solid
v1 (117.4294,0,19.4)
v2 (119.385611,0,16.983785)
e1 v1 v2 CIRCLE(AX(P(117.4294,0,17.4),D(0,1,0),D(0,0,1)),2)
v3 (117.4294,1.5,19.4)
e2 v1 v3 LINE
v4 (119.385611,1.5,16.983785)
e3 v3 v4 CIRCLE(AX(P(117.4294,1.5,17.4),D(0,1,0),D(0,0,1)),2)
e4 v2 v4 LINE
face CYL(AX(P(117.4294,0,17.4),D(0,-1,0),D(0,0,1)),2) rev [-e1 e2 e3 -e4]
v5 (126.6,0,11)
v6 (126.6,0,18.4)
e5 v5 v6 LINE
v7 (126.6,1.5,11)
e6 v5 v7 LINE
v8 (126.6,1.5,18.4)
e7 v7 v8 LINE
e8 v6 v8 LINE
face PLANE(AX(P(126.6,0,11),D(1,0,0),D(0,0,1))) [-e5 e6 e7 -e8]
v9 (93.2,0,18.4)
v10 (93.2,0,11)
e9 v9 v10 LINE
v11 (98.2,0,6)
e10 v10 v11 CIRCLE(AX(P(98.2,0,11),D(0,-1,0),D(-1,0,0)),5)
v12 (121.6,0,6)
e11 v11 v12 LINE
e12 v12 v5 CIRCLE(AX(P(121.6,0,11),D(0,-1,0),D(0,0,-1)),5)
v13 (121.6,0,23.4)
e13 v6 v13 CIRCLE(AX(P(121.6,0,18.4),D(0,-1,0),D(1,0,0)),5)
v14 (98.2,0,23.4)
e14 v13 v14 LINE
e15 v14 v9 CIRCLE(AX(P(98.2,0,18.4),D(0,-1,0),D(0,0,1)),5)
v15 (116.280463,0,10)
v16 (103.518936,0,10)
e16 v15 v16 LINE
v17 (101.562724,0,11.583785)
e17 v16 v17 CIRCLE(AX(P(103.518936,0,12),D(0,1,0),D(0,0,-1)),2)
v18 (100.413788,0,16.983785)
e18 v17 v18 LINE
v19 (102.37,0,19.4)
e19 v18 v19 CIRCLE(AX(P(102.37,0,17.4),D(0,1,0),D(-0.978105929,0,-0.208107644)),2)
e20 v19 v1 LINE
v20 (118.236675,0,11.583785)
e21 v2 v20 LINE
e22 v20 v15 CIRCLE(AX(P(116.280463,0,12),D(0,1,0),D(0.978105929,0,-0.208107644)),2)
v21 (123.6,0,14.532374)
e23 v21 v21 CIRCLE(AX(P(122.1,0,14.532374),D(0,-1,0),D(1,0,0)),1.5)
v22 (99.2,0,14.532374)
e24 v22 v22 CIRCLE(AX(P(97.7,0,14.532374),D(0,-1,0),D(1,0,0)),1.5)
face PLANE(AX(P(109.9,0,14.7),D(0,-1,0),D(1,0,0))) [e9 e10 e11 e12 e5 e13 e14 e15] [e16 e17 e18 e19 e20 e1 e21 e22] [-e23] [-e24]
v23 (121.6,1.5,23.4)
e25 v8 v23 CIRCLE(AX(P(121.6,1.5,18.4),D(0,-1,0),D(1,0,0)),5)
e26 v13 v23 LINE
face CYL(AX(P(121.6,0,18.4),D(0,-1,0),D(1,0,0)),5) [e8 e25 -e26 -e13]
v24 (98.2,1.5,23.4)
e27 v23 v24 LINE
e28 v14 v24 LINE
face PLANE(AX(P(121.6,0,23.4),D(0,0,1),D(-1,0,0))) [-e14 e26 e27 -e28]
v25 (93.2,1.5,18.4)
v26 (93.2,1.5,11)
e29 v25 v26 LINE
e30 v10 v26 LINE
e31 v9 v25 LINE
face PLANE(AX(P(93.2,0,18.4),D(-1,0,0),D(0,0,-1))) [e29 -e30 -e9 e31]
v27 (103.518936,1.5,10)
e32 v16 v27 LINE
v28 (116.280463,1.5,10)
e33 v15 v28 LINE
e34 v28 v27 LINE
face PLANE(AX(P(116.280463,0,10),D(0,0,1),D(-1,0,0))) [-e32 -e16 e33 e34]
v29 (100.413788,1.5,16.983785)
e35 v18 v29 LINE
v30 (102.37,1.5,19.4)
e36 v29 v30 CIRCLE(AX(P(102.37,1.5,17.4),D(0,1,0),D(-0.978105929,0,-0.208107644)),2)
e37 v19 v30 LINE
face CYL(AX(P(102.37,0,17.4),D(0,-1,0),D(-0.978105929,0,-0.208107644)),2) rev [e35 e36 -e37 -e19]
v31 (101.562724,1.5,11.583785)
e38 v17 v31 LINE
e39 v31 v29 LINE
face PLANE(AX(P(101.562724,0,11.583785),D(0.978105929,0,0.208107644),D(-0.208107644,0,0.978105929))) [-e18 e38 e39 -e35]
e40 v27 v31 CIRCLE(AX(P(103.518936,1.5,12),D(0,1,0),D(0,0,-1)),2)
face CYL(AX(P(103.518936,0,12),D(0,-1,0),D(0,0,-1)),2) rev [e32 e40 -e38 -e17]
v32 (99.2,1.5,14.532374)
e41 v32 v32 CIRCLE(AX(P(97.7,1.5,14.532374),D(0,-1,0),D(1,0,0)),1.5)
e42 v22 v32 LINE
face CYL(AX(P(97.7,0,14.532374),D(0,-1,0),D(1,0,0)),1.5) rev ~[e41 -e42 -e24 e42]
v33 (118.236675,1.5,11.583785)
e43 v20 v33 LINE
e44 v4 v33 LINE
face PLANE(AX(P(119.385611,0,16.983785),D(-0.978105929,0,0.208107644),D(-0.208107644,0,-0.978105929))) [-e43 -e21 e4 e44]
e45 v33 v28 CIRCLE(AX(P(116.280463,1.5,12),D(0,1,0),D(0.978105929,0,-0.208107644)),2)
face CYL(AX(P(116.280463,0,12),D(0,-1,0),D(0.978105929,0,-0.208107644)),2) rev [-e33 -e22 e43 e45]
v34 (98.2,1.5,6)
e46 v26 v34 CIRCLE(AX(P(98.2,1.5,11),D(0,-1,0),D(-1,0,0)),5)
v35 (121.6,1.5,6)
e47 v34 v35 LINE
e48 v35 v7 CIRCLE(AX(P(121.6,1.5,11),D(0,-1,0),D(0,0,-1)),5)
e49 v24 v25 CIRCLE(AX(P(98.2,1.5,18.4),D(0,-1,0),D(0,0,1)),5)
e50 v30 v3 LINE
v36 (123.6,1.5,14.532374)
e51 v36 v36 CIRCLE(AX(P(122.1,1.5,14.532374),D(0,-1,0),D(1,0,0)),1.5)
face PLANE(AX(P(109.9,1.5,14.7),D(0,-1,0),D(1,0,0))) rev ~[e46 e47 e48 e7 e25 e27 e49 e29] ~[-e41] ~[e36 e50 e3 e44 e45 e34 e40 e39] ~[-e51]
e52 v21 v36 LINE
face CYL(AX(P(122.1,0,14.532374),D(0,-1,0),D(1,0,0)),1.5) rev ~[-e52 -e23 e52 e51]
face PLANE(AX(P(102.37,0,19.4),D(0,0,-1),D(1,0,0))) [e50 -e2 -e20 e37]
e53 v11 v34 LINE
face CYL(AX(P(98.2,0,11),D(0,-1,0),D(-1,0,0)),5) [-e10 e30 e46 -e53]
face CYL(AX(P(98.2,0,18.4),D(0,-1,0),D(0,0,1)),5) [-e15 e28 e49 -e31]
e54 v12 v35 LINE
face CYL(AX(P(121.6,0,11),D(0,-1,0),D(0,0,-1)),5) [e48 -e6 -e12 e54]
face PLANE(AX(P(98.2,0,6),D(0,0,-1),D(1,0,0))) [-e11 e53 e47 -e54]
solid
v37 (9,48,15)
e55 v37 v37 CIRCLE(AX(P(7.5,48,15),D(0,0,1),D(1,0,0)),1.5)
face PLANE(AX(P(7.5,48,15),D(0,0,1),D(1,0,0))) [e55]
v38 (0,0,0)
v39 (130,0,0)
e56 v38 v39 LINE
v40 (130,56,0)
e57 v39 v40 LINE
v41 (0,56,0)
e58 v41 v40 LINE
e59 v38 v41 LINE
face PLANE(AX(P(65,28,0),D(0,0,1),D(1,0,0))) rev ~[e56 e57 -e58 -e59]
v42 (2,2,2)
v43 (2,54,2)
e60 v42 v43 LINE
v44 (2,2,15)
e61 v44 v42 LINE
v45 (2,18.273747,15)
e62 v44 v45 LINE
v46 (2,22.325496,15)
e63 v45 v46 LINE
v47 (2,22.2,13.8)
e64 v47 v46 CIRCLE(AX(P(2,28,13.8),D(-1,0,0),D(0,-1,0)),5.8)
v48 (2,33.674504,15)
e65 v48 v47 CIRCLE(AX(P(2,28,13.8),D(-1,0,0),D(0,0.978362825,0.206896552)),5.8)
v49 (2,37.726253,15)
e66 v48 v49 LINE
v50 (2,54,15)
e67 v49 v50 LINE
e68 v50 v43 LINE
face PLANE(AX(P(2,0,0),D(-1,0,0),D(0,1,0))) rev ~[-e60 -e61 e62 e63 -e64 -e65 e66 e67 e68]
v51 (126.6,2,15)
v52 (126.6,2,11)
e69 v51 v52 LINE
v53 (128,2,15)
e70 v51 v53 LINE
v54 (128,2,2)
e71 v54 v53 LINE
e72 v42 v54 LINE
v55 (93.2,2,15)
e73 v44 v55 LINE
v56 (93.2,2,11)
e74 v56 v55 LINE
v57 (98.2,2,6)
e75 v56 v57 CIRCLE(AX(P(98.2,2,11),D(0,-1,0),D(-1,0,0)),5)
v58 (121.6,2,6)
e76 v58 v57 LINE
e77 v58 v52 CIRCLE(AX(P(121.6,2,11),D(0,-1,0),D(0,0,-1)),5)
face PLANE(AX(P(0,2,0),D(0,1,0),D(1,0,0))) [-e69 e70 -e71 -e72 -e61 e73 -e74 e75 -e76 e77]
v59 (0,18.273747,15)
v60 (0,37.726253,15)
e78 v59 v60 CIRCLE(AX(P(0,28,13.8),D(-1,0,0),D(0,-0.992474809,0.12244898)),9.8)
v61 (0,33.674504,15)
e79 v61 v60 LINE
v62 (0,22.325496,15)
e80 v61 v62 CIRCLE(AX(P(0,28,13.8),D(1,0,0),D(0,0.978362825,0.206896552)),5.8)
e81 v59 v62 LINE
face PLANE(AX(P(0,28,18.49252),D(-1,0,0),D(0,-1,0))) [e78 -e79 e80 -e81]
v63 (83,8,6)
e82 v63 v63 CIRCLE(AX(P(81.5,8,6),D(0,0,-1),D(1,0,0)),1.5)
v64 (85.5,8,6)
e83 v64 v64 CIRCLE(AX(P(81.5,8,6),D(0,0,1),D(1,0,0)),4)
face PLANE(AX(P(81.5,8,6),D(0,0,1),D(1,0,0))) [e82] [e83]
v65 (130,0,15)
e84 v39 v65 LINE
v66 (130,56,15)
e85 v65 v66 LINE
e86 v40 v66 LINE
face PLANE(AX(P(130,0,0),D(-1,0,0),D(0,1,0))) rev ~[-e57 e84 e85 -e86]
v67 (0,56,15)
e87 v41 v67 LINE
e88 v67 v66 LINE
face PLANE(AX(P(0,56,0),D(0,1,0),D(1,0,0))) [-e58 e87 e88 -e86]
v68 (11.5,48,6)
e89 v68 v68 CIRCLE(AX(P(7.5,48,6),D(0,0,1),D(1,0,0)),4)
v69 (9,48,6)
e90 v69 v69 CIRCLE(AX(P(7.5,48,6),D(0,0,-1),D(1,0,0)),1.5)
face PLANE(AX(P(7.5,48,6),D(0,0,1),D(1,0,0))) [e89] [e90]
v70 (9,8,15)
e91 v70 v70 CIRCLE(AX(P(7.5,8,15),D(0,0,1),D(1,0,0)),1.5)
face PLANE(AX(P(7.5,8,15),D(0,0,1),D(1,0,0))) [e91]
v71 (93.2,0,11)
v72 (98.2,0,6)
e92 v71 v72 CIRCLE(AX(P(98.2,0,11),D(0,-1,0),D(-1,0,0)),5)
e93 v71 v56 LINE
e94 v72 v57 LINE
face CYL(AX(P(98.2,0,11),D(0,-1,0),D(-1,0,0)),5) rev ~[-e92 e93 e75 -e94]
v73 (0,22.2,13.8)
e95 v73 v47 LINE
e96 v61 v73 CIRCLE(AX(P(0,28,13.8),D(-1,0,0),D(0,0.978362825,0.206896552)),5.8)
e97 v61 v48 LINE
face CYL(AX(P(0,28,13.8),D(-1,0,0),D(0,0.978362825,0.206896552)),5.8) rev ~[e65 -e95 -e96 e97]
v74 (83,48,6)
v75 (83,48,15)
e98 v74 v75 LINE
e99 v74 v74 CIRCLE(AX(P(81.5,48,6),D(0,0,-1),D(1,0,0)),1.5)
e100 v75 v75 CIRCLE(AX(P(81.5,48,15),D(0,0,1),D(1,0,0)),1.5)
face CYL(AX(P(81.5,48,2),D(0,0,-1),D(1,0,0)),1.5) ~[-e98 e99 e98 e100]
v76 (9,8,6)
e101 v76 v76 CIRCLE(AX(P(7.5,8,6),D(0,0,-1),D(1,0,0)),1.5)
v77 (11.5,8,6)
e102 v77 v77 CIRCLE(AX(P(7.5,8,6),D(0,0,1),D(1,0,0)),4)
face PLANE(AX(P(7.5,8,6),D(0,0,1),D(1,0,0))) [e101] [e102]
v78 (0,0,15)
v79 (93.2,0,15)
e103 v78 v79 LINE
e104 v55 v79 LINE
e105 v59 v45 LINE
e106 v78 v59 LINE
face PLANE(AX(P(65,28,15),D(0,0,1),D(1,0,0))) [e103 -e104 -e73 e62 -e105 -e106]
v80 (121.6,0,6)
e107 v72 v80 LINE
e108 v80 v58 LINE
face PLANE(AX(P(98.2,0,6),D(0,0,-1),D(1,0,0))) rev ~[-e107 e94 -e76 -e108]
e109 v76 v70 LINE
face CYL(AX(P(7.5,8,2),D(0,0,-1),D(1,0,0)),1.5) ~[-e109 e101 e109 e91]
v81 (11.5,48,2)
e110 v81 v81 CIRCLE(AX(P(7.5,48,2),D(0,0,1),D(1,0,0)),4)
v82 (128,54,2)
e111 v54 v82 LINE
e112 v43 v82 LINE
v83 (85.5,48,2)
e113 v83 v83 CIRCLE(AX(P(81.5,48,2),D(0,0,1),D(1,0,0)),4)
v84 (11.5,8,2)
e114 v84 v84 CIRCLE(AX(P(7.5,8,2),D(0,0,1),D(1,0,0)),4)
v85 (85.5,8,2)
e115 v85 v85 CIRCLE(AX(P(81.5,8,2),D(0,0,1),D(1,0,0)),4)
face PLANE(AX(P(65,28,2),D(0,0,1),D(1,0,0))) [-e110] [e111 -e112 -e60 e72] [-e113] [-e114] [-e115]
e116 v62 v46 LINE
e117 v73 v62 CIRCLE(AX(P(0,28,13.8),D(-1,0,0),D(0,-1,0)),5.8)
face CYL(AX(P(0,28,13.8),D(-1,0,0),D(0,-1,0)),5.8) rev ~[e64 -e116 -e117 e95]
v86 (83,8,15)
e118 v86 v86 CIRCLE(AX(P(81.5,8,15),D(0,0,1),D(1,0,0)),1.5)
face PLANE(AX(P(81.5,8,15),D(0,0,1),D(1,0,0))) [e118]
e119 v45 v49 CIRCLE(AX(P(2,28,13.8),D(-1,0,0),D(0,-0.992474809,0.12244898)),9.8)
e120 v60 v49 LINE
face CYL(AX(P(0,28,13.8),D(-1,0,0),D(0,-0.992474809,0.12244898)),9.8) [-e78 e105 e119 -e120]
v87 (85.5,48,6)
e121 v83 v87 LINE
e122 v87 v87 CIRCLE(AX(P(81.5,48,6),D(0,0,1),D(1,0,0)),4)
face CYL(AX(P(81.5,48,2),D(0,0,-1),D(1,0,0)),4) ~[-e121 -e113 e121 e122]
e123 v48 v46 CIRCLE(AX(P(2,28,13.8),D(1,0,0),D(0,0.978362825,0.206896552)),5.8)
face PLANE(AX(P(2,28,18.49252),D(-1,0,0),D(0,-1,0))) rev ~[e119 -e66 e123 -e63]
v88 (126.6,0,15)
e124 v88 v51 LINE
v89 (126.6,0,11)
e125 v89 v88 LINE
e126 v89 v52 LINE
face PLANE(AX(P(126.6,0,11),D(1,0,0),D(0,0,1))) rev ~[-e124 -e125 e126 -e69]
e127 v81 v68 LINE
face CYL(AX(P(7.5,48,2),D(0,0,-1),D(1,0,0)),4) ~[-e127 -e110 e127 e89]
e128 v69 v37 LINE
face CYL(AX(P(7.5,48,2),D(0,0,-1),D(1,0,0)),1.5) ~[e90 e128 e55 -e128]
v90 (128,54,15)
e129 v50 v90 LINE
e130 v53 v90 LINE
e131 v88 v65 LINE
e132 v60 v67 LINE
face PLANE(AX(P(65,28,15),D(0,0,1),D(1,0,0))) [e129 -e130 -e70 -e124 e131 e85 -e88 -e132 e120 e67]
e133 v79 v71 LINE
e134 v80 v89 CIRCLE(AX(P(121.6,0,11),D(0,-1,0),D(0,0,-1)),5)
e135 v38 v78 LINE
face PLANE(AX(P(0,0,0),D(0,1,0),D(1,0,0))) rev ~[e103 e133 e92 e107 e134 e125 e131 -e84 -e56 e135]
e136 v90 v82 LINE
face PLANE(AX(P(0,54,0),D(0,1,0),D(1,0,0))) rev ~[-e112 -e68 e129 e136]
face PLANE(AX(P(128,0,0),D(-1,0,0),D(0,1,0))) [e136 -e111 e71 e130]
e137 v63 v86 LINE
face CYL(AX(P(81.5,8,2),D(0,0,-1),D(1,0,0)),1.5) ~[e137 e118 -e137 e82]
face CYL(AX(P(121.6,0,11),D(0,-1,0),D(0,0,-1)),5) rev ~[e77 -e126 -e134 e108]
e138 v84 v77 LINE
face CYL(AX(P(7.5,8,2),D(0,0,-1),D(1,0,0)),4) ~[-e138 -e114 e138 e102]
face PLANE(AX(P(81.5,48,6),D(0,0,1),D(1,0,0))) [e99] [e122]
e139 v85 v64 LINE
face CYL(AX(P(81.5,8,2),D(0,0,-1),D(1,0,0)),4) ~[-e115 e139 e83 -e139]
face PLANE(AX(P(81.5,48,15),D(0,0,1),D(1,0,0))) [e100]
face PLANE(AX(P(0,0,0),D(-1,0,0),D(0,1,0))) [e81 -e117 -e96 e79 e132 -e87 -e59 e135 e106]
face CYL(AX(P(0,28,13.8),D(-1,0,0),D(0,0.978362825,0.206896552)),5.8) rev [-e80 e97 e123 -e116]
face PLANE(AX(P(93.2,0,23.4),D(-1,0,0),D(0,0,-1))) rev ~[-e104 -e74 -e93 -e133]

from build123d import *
from build123d import SkipClean  # not in build123d's __all__

# Parameters (mm, degrees)
F0_W      = 130
F0_H      = 56
F1_DEPTH  = 15
F2_T      = -2
F3_R      = 1.5
F4_DEPTH  = 13
F5_R      = 4
F6_DEPTH  = 4
F9_DEPTH  = 5
F7_R      = 1.5
F10_DEPTH = 1.5
F12_DEPTH = 25
F14_DEPTH = 2


with BuildPart() as f1:
    # F0 (on Top) → F1 (new body)
    with BuildSketch(Plane.XY):
        with Locations((65, 28)):
            Rectangle(F0_W, F0_H)
    extrude(amount=F1_DEPTH)

    # F2
    f2_openings = [f1.faces().sort_by_distance(p)[0] for p in [
        (65, 28, 15),
    ]]
    offset(amount=F2_T, openings=f2_openings)

    # F3 (on face) → F4 (join)
    with BuildSketch(Plane.XY.offset(2)):
        with Locations((81.5, 48)):
            Circle(F3_R)
        with Locations((81.5, 8)):
            Circle(F3_R)
        with Locations((7.5, 8)):
            Circle(F3_R)
        with Locations((7.5, 48)):
            Circle(F3_R)
    extrude(amount=F4_DEPTH)

    # F5 (on face) → F6 (join)
    with BuildSketch(Plane.XY.offset(2)):
        with Locations((81.5, 48)):
            Circle(F5_R)
        with Locations((81.5, 8)):
            Circle(F5_R)
        with Locations((7.5, 48)):
            Circle(F5_R)
        with Locations((7.5, 8)):
            Circle(F5_R)
    extrude(amount=F6_DEPTH)

    # F8 (on face) → F9 (cut)
    with BuildSketch(Plane.XZ):
        with BuildLine():
            Line((126.6, 23.4), (93.2, 23.4))
            Line((93.2, 23.4), (93.2, 11))
            ThreePointArc((93.2, 11), (94.6644660941, 7.4644660941), (98.2, 6))
            Line((98.2, 6), (121.6, 6))
            ThreePointArc((121.6, 6), (125.1355339059, 7.4644660941), (126.6, 11))
            Line((126.6, 11), (126.6, 23.4))
        make_face()
    extrude(amount=-F9_DEPTH, mode=Mode.SUBTRACT)

    # F11 (on face) → F12 (cut)
    with BuildSketch(Plane(origin=(0, 0, 0), x_dir=(0, -1, 0), z_dir=(-1, 0, 0))):
        with BuildLine():
            ThreePointArc((-33.6745043836, 15), (-28.6032721504, 8.0314592216), (-22.2, 13.8))
            ThreePointArc((-22.2, 13.8), (-22.2314592216, 14.4032721504), (-22.3254956164, 15))
            Line((-22.3254956164, 15), (-33.6745043836, 15))
        make_face()
    extrude(amount=-F12_DEPTH, mode=Mode.SUBTRACT)

    # F13 (on face) → F14 (join)
    with BuildSketch(Plane(origin=(0, 0, 0), x_dir=(0, -1, 0), z_dir=(-1, 0, 0))):
        with BuildLine():
            ThreePointArc((-33.6745043836, 15), (-28, 19.6), (-22.3254956164, 15))
            Line((-22.3254956164, 15), (-18.2737468674, 15))
            ThreePointArc((-18.2737468674, 15), (-28, 23.6), (-37.7262531326, 15))
            Line((-37.7262531326, 15), (-33.6745043836, 15))
        make_face()
    with SkipClean():  # cleaning this boolean's faces spoils the solid; the shape is the same uncleaned
        extrude(amount=-F14_DEPTH)


with BuildPart() as f10:
    # F7 (on face) → F10 (new body)
    with BuildSketch(Plane.XZ):
        with BuildLine():
            Line((121.6, 23.4), (98.2, 23.4))
            ThreePointArc((98.2, 23.4), (94.6644660941, 21.9355339059), (93.2, 18.4))
            Line((93.2, 18.4), (93.2, 11))
            ThreePointArc((93.2, 11), (94.6644660941, 7.4644660941), (98.2, 6))
            Line((98.2, 6), (121.6, 6))
            ThreePointArc((121.6, 6), (125.1355339059, 7.4644660941), (126.6, 11))
            Line((126.6, 11), (126.6, 18.4))
            ThreePointArc((126.6, 18.4), (125.1355339059, 21.9355339059), (121.6, 23.4))
        make_face()
        with Locations((97.7, 14.5323744416)):
            Circle(F7_R, mode=Mode.SUBTRACT)
        with Locations((122.1, 14.5323744416)):
            Circle(F7_R, mode=Mode.SUBTRACT)
        with BuildLine():
            ThreePointArc((100.413788142, 16.9837847111), (100.8155820096, 18.6584850858), (102.37, 19.4))
            Line((102.37, 19.4), (117.4293995654, 19.4))
            ThreePointArc((117.4293995654, 19.4), (118.9838175558, 18.6584850858), (119.3856114233, 16.9837847111))
            Line((119.3856114233, 16.9837847111), (118.2366752531, 11.5837847111))
            ThreePointArc((118.2366752531, 11.5837847111), (117.5389484809, 10.4455820096), (116.2804633952, 10))
            Line((116.2804633952, 10), (103.5189361702, 10))
            ThreePointArc((103.5189361702, 10), (102.2604510845, 10.4455820096), (101.5627243122, 11.5837847111))
            Line((101.5627243122, 11.5837847111), (100.413788142, 16.9837847111))
        make_face(mode=Mode.SUBTRACT)
    extrude(amount=-F10_DEPTH)


solid = Compound([f1.part, f10.part])
